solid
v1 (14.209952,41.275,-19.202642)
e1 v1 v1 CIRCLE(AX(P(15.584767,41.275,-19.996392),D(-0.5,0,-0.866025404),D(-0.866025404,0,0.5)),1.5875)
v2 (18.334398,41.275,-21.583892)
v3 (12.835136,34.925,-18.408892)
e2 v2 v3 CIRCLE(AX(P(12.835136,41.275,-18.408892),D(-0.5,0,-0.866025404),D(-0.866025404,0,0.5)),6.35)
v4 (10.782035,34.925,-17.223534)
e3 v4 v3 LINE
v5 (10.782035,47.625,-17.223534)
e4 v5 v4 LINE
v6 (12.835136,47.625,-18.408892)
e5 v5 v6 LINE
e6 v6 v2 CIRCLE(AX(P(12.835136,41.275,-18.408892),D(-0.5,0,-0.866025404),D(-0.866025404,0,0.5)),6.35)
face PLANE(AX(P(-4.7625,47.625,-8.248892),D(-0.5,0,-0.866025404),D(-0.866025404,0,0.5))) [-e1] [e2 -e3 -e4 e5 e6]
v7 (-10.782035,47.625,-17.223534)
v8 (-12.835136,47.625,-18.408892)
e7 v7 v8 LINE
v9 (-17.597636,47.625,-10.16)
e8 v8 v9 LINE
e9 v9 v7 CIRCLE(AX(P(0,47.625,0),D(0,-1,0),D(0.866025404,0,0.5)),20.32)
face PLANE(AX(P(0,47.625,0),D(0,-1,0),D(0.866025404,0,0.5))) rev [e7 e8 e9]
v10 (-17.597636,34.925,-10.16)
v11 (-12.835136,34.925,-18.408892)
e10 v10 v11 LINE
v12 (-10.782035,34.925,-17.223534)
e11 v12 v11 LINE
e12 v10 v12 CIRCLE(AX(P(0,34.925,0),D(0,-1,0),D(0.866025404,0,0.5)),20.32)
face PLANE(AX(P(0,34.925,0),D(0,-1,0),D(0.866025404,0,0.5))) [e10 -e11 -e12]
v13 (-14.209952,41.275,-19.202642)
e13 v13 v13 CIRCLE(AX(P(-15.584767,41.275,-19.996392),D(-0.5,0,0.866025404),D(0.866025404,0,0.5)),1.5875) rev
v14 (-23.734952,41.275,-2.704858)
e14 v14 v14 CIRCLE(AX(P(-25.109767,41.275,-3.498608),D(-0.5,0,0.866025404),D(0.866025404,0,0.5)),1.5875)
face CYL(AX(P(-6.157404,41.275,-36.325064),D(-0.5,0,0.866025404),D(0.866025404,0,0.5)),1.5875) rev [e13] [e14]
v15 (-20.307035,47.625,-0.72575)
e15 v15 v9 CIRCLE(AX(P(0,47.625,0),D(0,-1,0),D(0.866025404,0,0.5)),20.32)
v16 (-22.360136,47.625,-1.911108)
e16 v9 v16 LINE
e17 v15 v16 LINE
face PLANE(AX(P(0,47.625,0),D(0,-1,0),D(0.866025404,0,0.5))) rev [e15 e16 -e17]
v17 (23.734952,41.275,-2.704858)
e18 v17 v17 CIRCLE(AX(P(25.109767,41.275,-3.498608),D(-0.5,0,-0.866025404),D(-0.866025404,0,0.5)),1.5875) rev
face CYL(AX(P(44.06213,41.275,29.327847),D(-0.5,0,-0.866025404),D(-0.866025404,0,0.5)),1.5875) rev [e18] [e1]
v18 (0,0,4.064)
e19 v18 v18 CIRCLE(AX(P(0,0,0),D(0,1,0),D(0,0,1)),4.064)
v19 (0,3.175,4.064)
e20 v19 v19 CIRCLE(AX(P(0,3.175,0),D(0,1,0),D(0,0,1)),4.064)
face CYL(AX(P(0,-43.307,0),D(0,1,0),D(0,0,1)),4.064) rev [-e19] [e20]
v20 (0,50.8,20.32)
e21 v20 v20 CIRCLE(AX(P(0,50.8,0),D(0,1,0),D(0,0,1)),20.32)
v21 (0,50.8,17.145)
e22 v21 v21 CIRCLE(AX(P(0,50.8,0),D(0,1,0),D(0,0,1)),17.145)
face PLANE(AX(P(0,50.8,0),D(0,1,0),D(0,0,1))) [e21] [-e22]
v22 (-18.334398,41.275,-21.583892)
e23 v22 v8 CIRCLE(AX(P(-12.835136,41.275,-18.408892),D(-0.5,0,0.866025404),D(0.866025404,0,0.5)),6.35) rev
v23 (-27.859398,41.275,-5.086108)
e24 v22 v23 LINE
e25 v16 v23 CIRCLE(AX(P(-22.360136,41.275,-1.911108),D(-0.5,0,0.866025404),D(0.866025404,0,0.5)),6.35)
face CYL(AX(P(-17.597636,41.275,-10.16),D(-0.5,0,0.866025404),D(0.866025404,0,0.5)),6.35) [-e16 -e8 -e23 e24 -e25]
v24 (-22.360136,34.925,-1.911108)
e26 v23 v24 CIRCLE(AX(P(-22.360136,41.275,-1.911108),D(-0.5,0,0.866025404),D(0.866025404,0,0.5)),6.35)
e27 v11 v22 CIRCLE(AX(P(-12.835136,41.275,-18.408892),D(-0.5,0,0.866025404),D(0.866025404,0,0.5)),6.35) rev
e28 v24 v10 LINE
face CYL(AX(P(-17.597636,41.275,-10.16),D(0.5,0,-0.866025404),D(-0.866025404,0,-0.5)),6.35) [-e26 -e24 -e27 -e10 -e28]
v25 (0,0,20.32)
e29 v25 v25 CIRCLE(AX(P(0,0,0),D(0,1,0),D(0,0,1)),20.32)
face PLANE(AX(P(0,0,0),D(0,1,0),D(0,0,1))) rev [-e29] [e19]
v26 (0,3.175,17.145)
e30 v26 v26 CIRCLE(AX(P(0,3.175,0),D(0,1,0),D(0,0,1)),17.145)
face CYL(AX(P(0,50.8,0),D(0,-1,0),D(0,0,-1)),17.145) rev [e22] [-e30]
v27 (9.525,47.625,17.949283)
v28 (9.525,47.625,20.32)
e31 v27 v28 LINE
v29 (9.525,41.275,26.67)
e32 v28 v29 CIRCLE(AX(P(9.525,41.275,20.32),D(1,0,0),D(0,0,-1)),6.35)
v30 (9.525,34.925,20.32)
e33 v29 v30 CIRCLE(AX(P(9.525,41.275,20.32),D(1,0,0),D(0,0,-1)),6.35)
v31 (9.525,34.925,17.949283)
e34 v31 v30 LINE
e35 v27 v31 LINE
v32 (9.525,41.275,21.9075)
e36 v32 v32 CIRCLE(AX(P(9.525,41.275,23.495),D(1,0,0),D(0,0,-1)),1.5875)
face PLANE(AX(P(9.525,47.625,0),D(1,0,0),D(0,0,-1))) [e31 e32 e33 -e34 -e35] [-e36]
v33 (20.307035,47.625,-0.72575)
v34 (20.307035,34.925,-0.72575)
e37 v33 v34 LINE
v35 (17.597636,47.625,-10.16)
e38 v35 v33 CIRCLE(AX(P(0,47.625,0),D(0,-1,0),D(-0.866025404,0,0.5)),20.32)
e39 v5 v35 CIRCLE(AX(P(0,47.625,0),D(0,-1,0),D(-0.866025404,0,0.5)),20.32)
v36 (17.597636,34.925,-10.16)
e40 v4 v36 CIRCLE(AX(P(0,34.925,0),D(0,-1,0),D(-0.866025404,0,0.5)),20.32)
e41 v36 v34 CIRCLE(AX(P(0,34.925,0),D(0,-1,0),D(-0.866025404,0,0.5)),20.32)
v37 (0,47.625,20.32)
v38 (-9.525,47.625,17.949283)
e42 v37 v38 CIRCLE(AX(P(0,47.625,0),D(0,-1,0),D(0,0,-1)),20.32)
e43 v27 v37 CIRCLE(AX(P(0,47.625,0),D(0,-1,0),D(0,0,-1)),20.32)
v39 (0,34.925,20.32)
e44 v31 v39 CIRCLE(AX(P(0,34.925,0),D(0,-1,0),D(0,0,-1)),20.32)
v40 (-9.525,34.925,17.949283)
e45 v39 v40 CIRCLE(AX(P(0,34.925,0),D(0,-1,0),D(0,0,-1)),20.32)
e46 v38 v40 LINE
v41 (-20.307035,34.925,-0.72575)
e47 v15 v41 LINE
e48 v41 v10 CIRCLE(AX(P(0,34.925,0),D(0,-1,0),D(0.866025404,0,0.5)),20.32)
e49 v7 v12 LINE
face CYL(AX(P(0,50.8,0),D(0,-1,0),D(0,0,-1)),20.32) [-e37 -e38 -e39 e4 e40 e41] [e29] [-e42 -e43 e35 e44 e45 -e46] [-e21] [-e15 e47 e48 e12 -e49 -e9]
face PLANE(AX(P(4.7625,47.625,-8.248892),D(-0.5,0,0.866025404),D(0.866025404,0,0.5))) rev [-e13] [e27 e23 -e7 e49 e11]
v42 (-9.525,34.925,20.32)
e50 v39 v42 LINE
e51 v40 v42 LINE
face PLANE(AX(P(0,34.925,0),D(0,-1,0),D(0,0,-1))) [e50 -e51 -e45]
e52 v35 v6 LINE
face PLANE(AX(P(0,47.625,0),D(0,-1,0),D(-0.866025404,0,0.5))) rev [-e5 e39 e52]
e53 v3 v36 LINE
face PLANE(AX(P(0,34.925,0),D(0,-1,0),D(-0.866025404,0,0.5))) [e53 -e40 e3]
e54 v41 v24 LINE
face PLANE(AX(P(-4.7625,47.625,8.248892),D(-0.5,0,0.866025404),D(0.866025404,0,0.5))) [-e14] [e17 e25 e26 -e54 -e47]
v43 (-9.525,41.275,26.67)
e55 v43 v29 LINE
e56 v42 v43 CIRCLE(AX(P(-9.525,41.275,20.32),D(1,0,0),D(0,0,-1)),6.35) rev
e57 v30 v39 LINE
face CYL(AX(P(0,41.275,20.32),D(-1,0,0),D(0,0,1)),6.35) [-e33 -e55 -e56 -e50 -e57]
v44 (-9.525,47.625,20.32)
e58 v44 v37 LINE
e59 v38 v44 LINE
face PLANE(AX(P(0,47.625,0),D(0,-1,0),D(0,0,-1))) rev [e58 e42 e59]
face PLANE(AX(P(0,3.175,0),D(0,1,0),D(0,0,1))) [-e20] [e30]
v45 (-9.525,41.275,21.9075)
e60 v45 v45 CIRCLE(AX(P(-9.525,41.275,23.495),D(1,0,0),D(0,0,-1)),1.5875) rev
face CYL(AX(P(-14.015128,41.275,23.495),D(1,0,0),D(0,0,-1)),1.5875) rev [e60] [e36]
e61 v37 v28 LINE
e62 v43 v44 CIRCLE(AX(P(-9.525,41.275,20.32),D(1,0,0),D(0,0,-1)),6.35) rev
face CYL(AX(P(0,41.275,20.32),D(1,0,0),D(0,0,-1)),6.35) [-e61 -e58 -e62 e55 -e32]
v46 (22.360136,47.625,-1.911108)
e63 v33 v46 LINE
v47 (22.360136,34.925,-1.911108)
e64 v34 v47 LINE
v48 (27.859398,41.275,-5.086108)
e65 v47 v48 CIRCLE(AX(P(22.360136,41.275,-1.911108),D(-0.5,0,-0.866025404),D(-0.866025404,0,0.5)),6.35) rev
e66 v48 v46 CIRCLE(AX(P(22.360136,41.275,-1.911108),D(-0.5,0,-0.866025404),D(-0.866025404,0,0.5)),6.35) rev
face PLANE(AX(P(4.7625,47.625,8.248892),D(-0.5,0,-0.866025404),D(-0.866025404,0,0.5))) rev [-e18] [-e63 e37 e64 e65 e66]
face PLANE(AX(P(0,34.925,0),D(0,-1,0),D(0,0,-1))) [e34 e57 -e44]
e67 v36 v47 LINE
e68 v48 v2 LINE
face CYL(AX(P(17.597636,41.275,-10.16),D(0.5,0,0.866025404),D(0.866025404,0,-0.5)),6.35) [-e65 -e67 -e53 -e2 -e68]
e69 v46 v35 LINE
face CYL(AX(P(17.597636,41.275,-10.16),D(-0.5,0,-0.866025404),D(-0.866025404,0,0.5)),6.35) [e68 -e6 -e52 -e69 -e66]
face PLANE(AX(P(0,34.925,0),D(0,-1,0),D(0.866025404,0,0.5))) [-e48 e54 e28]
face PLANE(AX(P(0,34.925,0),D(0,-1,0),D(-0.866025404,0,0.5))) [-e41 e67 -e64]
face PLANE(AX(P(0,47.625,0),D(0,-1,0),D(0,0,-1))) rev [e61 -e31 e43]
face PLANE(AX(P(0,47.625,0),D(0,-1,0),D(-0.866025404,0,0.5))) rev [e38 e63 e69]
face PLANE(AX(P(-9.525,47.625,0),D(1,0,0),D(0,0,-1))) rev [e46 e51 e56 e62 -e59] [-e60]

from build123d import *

# Parameters (mm, degrees)
SKETCH1_R                = 20.32
BOSS_EXTRUDE1_DEPTH      = 50.8
SHELL1_T                 = -3.175
CUT_EXTRUDE1_DEPTH       = 56.623245366
CUT_EXTRUDE1_DEPTH_BACK  = 46.482
SKETCH2_R                = 4.064
BOSS_EXTRUDE2_START      = -34.925
BOSS_EXTRUDE2_DEPTH      = 12.7
SKETCH4_R                = 1.5875
CUT_EXTRUDE2_DEPTH       = 19.05
FILLET1_R                = 6.35
CIRPATTERN1_COUNT        = 3
FILLET1_OF_CIRPATTERN1_R = 6.35


with BuildPart() as part:
    # Sketch1 → Boss-Extrude1 (new body)
    with BuildSketch(Plane(origin=(0, 0, 0), x_dir=(1, 0, 0), z_dir=(0, 1, 0))):
        with Locations(Location((0, 0, 0), (0, 0, 270))):
            Circle(SKETCH1_R)
    extrude(amount=BOSS_EXTRUDE1_DEPTH)

    # Shell1
    shell1_openings = [part.faces().sort_by_distance(p)[0] for p in [
        (0, 50.8, 0),
    ]]
    offset(amount=SHELL1_T, openings=shell1_openings, kind=Kind.INTERSECTION)

    # Sketch2 → Cut-Extrude1 (cut, two sides: drawn at the far end of the back side and taken through both)
    with BuildSketch(Plane(origin=(0, 3.175, 0), x_dir=(1, 0, 0), z_dir=(0, 1, 0)).offset(-CUT_EXTRUDE1_DEPTH_BACK)):
        with Locations(Location((0, 0, 0), (0, 0, 270))):
            Circle(SKETCH2_R)
    extrude(amount=CUT_EXTRUDE1_DEPTH + CUT_EXTRUDE1_DEPTH_BACK, mode=Mode.SUBTRACT)

    # Sketch3 → Boss-Extrude2 (add)
    with BuildSketch(Plane.XZ.offset(BOSS_EXTRUDE2_START)):
        with BuildLine():
            ThreePointArc((-9.525, 17.949283412), (0, 20.32), (9.525, 17.949283412))
            Line((9.525, 17.949283412), (9.525, 26.67))
            Line((9.525, 26.67), (-9.525, 26.67))
            Line((-9.525, 26.67), (-9.525, 17.949283412))
        make_face()
    boss_extrude2 = extrude(amount=-BOSS_EXTRUDE2_DEPTH)

    # Sketch4 → Cut-Extrude2 (cut)
    with BuildSketch(Plane(origin=(9.525, 0, 0), x_dir=(0, 0, -1), z_dir=(1, 0, 0))):
        with Locations((-23.495, 41.275)):
            Circle(SKETCH4_R)
    cut_extrude2 = extrude(amount=-CUT_EXTRUDE2_DEPTH, mode=Mode.SUBTRACT)

    # Fillet1
    fillet1_edges = [part.edges().sort_by_distance(p)[0] for p in [
        (0, 47.625, 26.67),
        (0, 34.925, 26.67),
    ]]
    fillet(fillet1_edges, radius=FILLET1_R - 0.0001)  # a hair under: the kernel refuses the full size

    # CirPattern1: Boss-Extrude2, Cut-Extrude2 ×3 about axis
    cirpattern1_axis = Axis((0, 0, 0), (0, 1, 0))
    add([boss_extrude2.rotate(cirpattern1_axis, i * 360 / CIRPATTERN1_COUNT) for i in range(1, CIRPATTERN1_COUNT)])
    add([cut_extrude2.rotate(cirpattern1_axis, i * 360 / CIRPATTERN1_COUNT) for i in range(1, CIRPATTERN1_COUNT)], mode=Mode.SUBTRACT)

    # Fillet1 of CirPattern1
    fillet1_of_cirpattern1_edges = [part.edges().sort_by_distance(p)[0] for p in [
        (23.096897519, 47.625, -13.335),
        (23.096897519, 34.925, -13.335),
        (-23.096897519, 47.625, -13.335),
        (-23.096897519, 34.925, -13.335),
    ]]
    fillet(fillet1_of_cirpattern1_edges, radius=FILLET1_OF_CIRPATTERN1_R - 0.0001)  # a hair under: the kernel refuses the full size


solid = part.part
